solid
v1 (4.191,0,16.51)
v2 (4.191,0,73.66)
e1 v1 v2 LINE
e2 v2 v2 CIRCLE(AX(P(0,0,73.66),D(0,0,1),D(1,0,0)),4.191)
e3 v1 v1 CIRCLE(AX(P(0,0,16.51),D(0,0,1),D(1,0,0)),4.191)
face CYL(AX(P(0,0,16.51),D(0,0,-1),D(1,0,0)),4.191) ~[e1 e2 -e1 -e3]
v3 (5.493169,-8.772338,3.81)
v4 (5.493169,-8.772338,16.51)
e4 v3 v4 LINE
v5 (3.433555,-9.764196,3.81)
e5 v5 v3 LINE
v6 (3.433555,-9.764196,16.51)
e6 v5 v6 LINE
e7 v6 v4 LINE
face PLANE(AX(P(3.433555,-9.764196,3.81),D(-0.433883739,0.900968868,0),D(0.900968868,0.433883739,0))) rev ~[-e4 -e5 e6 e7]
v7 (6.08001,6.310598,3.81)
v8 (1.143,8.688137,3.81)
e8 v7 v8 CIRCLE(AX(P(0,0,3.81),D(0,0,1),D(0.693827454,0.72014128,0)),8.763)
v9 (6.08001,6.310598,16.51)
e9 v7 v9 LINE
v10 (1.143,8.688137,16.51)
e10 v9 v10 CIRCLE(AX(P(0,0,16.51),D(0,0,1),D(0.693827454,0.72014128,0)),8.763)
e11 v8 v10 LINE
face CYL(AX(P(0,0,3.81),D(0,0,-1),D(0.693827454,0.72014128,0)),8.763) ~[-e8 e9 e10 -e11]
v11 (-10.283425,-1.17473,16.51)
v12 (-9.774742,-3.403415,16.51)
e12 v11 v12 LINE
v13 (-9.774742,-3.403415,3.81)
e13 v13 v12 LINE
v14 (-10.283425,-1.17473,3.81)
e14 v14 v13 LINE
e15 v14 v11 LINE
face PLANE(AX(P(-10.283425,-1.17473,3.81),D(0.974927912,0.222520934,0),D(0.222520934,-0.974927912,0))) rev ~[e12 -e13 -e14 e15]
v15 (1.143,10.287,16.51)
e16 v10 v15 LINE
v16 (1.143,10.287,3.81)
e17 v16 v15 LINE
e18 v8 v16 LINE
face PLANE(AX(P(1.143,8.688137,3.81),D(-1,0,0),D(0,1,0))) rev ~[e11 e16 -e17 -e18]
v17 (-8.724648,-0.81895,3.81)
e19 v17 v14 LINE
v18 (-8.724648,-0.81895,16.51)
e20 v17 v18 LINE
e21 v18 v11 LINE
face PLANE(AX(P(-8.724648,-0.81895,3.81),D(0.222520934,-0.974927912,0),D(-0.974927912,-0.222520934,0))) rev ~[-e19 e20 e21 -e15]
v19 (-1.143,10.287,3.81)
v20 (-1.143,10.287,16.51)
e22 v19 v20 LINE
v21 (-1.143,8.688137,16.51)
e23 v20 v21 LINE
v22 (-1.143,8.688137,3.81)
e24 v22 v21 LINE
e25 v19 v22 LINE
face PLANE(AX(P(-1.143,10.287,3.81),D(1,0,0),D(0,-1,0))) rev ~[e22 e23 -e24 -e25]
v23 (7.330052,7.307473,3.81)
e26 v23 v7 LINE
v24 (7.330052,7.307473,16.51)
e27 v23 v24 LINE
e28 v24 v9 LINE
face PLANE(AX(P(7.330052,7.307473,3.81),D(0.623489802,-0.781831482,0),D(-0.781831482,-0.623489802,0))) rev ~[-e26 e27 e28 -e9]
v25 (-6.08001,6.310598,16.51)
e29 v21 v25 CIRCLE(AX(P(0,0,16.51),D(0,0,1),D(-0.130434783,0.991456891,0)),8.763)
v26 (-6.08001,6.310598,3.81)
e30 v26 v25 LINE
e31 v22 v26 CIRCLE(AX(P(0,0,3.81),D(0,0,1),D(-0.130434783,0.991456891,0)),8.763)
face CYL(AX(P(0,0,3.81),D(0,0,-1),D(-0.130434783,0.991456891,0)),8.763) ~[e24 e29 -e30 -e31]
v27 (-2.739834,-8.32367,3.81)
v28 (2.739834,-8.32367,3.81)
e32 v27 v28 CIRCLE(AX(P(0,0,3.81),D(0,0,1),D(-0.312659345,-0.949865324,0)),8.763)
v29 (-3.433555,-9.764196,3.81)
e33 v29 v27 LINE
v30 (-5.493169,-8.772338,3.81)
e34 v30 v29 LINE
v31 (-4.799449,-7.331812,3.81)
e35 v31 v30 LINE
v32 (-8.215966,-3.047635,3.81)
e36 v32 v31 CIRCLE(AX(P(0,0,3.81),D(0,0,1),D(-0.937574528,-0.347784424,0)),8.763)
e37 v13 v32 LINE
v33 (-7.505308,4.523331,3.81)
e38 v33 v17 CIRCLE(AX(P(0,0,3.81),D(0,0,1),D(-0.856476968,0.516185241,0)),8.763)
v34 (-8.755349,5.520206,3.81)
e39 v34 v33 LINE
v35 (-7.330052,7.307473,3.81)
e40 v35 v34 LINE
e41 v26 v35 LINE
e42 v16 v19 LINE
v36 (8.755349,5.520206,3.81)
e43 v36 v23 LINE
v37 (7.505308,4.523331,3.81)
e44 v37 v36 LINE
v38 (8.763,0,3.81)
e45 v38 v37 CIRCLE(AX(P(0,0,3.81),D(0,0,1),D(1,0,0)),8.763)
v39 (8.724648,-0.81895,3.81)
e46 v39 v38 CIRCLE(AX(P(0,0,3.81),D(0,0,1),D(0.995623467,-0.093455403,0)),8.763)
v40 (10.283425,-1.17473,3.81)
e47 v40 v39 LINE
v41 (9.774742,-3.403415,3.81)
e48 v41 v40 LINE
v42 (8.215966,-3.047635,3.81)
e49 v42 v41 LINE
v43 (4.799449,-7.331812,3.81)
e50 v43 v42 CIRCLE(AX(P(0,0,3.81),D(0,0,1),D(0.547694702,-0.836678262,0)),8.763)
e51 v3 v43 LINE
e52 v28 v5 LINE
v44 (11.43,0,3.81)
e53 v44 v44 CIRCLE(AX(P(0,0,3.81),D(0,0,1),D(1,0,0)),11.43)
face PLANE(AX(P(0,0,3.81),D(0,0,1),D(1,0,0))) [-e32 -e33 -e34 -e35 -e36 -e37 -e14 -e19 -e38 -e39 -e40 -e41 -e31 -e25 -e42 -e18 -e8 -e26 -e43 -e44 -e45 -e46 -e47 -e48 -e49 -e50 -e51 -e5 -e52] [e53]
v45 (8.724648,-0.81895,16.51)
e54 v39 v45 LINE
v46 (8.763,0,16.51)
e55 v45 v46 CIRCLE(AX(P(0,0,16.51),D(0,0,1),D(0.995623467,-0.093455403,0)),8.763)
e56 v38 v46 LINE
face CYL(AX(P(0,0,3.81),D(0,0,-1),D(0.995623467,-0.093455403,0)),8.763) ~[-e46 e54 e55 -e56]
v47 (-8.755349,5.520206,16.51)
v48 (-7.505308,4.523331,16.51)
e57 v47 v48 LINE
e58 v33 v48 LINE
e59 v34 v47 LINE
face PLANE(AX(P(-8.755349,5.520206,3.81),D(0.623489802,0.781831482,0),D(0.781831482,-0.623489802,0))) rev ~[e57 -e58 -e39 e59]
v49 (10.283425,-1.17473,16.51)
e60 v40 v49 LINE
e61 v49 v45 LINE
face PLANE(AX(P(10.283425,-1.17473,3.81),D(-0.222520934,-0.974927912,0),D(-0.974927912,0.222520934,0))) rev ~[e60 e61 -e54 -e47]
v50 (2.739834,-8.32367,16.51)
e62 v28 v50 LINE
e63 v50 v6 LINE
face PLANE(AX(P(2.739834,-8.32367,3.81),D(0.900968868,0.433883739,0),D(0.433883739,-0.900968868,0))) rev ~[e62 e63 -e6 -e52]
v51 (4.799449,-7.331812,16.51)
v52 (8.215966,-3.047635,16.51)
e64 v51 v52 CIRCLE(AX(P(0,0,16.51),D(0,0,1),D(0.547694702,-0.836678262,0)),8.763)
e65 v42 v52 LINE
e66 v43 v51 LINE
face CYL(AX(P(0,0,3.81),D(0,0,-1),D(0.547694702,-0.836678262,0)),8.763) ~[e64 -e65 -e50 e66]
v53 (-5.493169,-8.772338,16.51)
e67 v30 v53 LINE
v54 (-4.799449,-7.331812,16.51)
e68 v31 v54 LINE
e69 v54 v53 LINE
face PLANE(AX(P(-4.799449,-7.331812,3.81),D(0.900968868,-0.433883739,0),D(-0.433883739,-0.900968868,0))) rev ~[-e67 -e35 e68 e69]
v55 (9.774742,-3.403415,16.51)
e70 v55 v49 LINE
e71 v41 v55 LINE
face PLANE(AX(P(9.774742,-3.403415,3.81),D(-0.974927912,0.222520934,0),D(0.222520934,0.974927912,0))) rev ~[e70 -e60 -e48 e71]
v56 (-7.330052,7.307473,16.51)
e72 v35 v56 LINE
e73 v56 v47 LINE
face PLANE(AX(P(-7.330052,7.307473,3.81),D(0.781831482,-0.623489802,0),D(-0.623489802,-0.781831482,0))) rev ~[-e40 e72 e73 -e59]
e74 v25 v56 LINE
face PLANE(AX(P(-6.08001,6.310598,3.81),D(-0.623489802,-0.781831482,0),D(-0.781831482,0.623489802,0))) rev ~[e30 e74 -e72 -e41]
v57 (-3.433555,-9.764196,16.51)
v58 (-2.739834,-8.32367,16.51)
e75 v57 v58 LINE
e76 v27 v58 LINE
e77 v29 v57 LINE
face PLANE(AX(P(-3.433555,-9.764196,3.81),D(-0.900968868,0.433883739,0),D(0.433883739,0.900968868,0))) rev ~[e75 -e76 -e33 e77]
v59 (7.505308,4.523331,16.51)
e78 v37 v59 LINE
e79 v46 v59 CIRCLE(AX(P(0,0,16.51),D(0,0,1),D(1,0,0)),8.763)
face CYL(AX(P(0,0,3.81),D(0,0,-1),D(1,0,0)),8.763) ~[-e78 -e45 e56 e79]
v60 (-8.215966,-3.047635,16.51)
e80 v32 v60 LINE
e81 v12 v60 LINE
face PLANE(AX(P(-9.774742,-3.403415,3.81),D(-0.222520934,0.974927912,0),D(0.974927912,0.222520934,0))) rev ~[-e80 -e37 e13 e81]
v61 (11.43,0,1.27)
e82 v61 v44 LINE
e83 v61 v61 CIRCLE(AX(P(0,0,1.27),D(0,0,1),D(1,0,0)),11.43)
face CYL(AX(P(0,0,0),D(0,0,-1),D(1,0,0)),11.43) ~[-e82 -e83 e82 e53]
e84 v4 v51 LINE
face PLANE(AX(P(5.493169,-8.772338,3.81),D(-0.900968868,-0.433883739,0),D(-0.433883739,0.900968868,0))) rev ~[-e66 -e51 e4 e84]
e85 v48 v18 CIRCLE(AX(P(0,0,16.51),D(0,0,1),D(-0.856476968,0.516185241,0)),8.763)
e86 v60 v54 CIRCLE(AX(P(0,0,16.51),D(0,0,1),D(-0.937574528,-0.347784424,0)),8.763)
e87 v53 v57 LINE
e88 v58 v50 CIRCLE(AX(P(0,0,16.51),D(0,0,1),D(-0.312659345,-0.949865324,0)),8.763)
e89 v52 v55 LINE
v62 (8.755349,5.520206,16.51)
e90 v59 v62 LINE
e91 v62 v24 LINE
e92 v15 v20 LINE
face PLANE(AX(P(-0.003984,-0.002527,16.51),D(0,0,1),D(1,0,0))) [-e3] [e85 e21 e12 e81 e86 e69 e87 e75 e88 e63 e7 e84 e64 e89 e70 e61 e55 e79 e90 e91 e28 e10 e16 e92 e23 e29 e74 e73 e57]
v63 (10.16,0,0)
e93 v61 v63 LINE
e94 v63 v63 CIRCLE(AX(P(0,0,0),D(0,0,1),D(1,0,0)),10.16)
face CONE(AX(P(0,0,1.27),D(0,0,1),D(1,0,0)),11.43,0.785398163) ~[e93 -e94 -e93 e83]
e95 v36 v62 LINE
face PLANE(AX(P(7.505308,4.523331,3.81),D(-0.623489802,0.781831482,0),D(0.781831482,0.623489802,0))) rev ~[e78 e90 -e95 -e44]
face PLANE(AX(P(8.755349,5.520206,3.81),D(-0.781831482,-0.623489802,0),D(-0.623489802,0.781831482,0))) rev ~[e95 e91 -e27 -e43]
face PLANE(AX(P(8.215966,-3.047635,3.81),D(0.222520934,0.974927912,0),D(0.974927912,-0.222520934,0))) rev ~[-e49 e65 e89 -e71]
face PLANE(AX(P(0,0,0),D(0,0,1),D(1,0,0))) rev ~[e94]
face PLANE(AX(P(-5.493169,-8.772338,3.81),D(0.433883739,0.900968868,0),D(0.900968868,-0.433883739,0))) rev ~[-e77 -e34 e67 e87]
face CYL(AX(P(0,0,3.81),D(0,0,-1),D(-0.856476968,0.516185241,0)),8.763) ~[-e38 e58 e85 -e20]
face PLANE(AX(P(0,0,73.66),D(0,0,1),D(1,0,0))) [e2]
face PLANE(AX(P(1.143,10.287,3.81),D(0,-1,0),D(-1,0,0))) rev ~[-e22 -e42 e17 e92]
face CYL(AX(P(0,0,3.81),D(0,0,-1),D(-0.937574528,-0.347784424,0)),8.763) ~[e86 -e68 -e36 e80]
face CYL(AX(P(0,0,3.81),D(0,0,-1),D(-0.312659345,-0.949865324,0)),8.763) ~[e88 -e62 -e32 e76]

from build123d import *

# Parameters (mm, degrees)
F0_R     = 11.43
F1_DEPTH = 3.81
F3_DEPTH = 12.7
F4_R     = 4.191
F5_DEPTH = 57.15
F6_DEPTH = 57.15
F7_SIZE  = 1.27
F8_DEPTH = 12.7


with BuildPart() as f1:
    # F0 (on Top) → F1 (new body)
    with BuildSketch(Plane.XY):
        Circle(F0_R)
    extrude(amount=F1_DEPTH)

    # F2 (on face) → F3 (join)
    with BuildSketch(Plane.XY.offset(3.81)):
        with BuildLine():
            ThreePointArc((8.7246484395, -0.8189496979), (8.7534068589, -0.4099236057), (8.763, 0))
            ThreePointArc((8.763, 0), (8.4427240898, 2.3474622346), (7.5053076703, 4.5233312696))
            ThreePointArc((7.5053076703, 4.5233312696), (6.8511892809, 5.4636411337), (6.0800099832, 6.3105980385))
            ThreePointArc((6.0800099832, 6.3105980385), (3.8021232059, 7.8951901894), (1.143, 8.6881367393))
            ThreePointArc((1.143, 8.6881367393), (0, 8.763), (-1.143, 8.6881367393))
            ThreePointArc((-1.143, 8.6881367393), (-3.8021232059, 7.8951901894), (-6.0800099832, 6.3105980385))
            ThreePointArc((-6.0800099832, 6.3105980385), (-6.8511892809, 5.4636411337), (-7.5053076703, 4.5233312696))
            ThreePointArc((-7.5053076703, 4.5233312696), (-8.5432932944, 1.9499509443), (-8.7246484395, -0.8189496979))
            ThreePointArc((-8.7246484395, -0.8189496979), (-8.5432932944, -1.9499509443), (-8.2159655844, -3.0476349052))
            ThreePointArc((-8.2159655844, -3.0476349052), (-6.8511892809, -5.4636411337), (-4.7994486704, -7.3318116083))
            ThreePointArc((-4.7994486704, -7.3318116083), (-3.8021232059, -7.8951901894), (-2.7398338384, -8.323669836))
            ThreePointArc((-2.7398338384, -8.323669836), (0, -8.763), (2.7398338384, -8.323669836))
            ThreePointArc((2.7398338384, -8.323669836), (3.8021232059, -7.8951901894), (4.7994486704, -7.3318116083))
            ThreePointArc((4.7994486704, -7.3318116083), (6.8511892809, -5.4636411337), (8.2159655844, -3.0476349052))
            ThreePointArc((8.2159655844, -3.0476349052), (8.5432932944, -1.9499509443), (8.7246484395, -0.8189496979))
        make_face()
    extrude(amount=F3_DEPTH)

    # F4 (on face) → F5 (join)
    with BuildSketch(Plane.XY.offset(16.51)):
        Circle(F4_R)
    extrude(amount=F5_DEPTH)

    # F4 (on face) → F6 (join)
    with BuildSketch(Plane.XY.offset(16.51)):
        Circle(F4_R)
    extrude(amount=F6_DEPTH)

    # F7
    f7_edges = [f1.edges().sort_by_distance(p)[0] for p in [
        (-11.43, 0, 0),
    ]]
    chamfer(f7_edges, length=F7_SIZE)

    # F2 (on face) → F8 (join)
    with BuildSketch(Plane.XY.offset(3.81)):
        with BuildLine():
            ThreePointArc((8.7246484395, -0.8189496979), (8.7534068589, -0.4099236057), (8.763, 0))
            ThreePointArc((8.763, 0), (8.4427240898, 2.3474622346), (7.5053076703, 4.5233312696))
            ThreePointArc((7.5053076703, 4.5233312696), (6.8511892809, 5.4636411337), (6.0800099832, 6.3105980385))
            ThreePointArc((6.0800099832, 6.3105980385), (3.8021232059, 7.8951901894), (1.143, 8.6881367393))
            ThreePointArc((1.143, 8.6881367393), (0, 8.763), (-1.143, 8.6881367393))
            ThreePointArc((-1.143, 8.6881367393), (-3.8021232059, 7.8951901894), (-6.0800099832, 6.3105980385))
            ThreePointArc((-6.0800099832, 6.3105980385), (-6.8511892809, 5.4636411337), (-7.5053076703, 4.5233312696))
            ThreePointArc((-7.5053076703, 4.5233312696), (-8.5432932944, 1.9499509443), (-8.7246484395, -0.8189496979))
            ThreePointArc((-8.7246484395, -0.8189496979), (-8.5432932944, -1.9499509443), (-8.2159655844, -3.0476349052))
            ThreePointArc((-8.2159655844, -3.0476349052), (-6.8511892809, -5.4636411337), (-4.7994486704, -7.3318116083))
            ThreePointArc((-4.7994486704, -7.3318116083), (-3.8021232059, -7.8951901894), (-2.7398338384, -8.323669836))
            ThreePointArc((-2.7398338384, -8.323669836), (0, -8.763), (2.7398338384, -8.323669836))
            ThreePointArc((2.7398338384, -8.323669836), (3.8021232059, -7.8951901894), (4.7994486704, -7.3318116083))
            ThreePointArc((4.7994486704, -7.3318116083), (6.8511892809, -5.4636411337), (8.2159655844, -3.0476349052))
            ThreePointArc((8.2159655844, -3.0476349052), (8.5432932944, -1.9499509443), (8.7246484395, -0.8189496979))
        make_face()
        with BuildLine():
            ThreePointArc((6.0800099832, 6.3105980385), (6.8511892809, 5.4636411337), (7.5053076703, 4.5233312696))
            Line((7.5053076703, 4.5233312696), (8.7553493037, 5.5202062073))
            Line((8.7553493037, 5.5202062073), (7.3300516166, 7.3074729762))
            Line((7.3300516166, 7.3074729762), (6.0800099832, 6.3105980385))
        make_face()
        with BuildLine():
            Line((10.2834248601, -1.174730244), (8.7246484395, -0.8189496979))
            ThreePointArc((8.7246484395, -0.8189496979), (8.5432932944, -1.9499509443), (8.2159655844, -3.0476349052))
            Line((8.2159655844, -3.0476349052), (9.7747420051, -3.4034154512))
            Line((9.7747420051, -3.4034154512), (10.2834248601, -1.174730244))
        make_face()
        with BuildLine():
            ThreePointArc((-1.143, 8.6881367393), (0, 8.763), (1.143, 8.6881367393))
            Line((1.143, 8.6881367393), (1.143, 10.287))
            Line((1.143, 10.287), (-1.143, 10.287))
            Line((-1.143, 10.287), (-1.143, 8.6881367393))
        make_face()
        with BuildLine():
            Line((5.4931694403, -8.7723376303), (4.7994486704, -7.3318116083))
            ThreePointArc((4.7994486704, -7.3318116083), (3.8021232059, -7.8951901894), (2.7398338384, -8.323669836))
            Line((2.7398338384, -8.323669836), (3.4335546083, -9.7641958579))
            Line((3.4335546083, -9.7641958579), (5.4931694403, -8.7723376303))
        make_face()
        with BuildLine():
            ThreePointArc((-7.5053076703, 4.5233312696), (-6.8511892809, 5.4636411337), (-6.0800099832, 6.3105980385))
            Line((-6.0800099832, 6.3105980385), (-7.3300516166, 7.3074729762))
            Line((-7.3300516166, 7.3074729762), (-8.7553493037, 5.5202062073))
            Line((-8.7553493037, 5.5202062073), (-7.5053076703, 4.5233312696))
        make_face()
        with BuildLine():
            Line((-3.4335546083, -9.7641958579), (-2.7398338384, -8.323669836))
            ThreePointArc((-2.7398338384, -8.323669836), (-3.8021232059, -7.8951901894), (-4.7994486704, -7.3318116083))
            Line((-4.7994486704, -7.3318116083), (-5.4931694403, -8.7723376303))
            Line((-5.4931694403, -8.7723376303), (-3.4335546083, -9.7641958579))
        make_face()
        with BuildLine():
            ThreePointArc((-8.2159655844, -3.0476349052), (-8.5432932944, -1.9499509443), (-8.7246484395, -0.8189496979))
            Line((-8.7246484395, -0.8189496979), (-10.2834248601, -1.174730244))
            Line((-10.2834248601, -1.174730244), (-9.7747420051, -3.4034154512))
            Line((-9.7747420051, -3.4034154512), (-8.2159655844, -3.0476349052))
        make_face()
    extrude(amount=F8_DEPTH)


solid = f1.part
